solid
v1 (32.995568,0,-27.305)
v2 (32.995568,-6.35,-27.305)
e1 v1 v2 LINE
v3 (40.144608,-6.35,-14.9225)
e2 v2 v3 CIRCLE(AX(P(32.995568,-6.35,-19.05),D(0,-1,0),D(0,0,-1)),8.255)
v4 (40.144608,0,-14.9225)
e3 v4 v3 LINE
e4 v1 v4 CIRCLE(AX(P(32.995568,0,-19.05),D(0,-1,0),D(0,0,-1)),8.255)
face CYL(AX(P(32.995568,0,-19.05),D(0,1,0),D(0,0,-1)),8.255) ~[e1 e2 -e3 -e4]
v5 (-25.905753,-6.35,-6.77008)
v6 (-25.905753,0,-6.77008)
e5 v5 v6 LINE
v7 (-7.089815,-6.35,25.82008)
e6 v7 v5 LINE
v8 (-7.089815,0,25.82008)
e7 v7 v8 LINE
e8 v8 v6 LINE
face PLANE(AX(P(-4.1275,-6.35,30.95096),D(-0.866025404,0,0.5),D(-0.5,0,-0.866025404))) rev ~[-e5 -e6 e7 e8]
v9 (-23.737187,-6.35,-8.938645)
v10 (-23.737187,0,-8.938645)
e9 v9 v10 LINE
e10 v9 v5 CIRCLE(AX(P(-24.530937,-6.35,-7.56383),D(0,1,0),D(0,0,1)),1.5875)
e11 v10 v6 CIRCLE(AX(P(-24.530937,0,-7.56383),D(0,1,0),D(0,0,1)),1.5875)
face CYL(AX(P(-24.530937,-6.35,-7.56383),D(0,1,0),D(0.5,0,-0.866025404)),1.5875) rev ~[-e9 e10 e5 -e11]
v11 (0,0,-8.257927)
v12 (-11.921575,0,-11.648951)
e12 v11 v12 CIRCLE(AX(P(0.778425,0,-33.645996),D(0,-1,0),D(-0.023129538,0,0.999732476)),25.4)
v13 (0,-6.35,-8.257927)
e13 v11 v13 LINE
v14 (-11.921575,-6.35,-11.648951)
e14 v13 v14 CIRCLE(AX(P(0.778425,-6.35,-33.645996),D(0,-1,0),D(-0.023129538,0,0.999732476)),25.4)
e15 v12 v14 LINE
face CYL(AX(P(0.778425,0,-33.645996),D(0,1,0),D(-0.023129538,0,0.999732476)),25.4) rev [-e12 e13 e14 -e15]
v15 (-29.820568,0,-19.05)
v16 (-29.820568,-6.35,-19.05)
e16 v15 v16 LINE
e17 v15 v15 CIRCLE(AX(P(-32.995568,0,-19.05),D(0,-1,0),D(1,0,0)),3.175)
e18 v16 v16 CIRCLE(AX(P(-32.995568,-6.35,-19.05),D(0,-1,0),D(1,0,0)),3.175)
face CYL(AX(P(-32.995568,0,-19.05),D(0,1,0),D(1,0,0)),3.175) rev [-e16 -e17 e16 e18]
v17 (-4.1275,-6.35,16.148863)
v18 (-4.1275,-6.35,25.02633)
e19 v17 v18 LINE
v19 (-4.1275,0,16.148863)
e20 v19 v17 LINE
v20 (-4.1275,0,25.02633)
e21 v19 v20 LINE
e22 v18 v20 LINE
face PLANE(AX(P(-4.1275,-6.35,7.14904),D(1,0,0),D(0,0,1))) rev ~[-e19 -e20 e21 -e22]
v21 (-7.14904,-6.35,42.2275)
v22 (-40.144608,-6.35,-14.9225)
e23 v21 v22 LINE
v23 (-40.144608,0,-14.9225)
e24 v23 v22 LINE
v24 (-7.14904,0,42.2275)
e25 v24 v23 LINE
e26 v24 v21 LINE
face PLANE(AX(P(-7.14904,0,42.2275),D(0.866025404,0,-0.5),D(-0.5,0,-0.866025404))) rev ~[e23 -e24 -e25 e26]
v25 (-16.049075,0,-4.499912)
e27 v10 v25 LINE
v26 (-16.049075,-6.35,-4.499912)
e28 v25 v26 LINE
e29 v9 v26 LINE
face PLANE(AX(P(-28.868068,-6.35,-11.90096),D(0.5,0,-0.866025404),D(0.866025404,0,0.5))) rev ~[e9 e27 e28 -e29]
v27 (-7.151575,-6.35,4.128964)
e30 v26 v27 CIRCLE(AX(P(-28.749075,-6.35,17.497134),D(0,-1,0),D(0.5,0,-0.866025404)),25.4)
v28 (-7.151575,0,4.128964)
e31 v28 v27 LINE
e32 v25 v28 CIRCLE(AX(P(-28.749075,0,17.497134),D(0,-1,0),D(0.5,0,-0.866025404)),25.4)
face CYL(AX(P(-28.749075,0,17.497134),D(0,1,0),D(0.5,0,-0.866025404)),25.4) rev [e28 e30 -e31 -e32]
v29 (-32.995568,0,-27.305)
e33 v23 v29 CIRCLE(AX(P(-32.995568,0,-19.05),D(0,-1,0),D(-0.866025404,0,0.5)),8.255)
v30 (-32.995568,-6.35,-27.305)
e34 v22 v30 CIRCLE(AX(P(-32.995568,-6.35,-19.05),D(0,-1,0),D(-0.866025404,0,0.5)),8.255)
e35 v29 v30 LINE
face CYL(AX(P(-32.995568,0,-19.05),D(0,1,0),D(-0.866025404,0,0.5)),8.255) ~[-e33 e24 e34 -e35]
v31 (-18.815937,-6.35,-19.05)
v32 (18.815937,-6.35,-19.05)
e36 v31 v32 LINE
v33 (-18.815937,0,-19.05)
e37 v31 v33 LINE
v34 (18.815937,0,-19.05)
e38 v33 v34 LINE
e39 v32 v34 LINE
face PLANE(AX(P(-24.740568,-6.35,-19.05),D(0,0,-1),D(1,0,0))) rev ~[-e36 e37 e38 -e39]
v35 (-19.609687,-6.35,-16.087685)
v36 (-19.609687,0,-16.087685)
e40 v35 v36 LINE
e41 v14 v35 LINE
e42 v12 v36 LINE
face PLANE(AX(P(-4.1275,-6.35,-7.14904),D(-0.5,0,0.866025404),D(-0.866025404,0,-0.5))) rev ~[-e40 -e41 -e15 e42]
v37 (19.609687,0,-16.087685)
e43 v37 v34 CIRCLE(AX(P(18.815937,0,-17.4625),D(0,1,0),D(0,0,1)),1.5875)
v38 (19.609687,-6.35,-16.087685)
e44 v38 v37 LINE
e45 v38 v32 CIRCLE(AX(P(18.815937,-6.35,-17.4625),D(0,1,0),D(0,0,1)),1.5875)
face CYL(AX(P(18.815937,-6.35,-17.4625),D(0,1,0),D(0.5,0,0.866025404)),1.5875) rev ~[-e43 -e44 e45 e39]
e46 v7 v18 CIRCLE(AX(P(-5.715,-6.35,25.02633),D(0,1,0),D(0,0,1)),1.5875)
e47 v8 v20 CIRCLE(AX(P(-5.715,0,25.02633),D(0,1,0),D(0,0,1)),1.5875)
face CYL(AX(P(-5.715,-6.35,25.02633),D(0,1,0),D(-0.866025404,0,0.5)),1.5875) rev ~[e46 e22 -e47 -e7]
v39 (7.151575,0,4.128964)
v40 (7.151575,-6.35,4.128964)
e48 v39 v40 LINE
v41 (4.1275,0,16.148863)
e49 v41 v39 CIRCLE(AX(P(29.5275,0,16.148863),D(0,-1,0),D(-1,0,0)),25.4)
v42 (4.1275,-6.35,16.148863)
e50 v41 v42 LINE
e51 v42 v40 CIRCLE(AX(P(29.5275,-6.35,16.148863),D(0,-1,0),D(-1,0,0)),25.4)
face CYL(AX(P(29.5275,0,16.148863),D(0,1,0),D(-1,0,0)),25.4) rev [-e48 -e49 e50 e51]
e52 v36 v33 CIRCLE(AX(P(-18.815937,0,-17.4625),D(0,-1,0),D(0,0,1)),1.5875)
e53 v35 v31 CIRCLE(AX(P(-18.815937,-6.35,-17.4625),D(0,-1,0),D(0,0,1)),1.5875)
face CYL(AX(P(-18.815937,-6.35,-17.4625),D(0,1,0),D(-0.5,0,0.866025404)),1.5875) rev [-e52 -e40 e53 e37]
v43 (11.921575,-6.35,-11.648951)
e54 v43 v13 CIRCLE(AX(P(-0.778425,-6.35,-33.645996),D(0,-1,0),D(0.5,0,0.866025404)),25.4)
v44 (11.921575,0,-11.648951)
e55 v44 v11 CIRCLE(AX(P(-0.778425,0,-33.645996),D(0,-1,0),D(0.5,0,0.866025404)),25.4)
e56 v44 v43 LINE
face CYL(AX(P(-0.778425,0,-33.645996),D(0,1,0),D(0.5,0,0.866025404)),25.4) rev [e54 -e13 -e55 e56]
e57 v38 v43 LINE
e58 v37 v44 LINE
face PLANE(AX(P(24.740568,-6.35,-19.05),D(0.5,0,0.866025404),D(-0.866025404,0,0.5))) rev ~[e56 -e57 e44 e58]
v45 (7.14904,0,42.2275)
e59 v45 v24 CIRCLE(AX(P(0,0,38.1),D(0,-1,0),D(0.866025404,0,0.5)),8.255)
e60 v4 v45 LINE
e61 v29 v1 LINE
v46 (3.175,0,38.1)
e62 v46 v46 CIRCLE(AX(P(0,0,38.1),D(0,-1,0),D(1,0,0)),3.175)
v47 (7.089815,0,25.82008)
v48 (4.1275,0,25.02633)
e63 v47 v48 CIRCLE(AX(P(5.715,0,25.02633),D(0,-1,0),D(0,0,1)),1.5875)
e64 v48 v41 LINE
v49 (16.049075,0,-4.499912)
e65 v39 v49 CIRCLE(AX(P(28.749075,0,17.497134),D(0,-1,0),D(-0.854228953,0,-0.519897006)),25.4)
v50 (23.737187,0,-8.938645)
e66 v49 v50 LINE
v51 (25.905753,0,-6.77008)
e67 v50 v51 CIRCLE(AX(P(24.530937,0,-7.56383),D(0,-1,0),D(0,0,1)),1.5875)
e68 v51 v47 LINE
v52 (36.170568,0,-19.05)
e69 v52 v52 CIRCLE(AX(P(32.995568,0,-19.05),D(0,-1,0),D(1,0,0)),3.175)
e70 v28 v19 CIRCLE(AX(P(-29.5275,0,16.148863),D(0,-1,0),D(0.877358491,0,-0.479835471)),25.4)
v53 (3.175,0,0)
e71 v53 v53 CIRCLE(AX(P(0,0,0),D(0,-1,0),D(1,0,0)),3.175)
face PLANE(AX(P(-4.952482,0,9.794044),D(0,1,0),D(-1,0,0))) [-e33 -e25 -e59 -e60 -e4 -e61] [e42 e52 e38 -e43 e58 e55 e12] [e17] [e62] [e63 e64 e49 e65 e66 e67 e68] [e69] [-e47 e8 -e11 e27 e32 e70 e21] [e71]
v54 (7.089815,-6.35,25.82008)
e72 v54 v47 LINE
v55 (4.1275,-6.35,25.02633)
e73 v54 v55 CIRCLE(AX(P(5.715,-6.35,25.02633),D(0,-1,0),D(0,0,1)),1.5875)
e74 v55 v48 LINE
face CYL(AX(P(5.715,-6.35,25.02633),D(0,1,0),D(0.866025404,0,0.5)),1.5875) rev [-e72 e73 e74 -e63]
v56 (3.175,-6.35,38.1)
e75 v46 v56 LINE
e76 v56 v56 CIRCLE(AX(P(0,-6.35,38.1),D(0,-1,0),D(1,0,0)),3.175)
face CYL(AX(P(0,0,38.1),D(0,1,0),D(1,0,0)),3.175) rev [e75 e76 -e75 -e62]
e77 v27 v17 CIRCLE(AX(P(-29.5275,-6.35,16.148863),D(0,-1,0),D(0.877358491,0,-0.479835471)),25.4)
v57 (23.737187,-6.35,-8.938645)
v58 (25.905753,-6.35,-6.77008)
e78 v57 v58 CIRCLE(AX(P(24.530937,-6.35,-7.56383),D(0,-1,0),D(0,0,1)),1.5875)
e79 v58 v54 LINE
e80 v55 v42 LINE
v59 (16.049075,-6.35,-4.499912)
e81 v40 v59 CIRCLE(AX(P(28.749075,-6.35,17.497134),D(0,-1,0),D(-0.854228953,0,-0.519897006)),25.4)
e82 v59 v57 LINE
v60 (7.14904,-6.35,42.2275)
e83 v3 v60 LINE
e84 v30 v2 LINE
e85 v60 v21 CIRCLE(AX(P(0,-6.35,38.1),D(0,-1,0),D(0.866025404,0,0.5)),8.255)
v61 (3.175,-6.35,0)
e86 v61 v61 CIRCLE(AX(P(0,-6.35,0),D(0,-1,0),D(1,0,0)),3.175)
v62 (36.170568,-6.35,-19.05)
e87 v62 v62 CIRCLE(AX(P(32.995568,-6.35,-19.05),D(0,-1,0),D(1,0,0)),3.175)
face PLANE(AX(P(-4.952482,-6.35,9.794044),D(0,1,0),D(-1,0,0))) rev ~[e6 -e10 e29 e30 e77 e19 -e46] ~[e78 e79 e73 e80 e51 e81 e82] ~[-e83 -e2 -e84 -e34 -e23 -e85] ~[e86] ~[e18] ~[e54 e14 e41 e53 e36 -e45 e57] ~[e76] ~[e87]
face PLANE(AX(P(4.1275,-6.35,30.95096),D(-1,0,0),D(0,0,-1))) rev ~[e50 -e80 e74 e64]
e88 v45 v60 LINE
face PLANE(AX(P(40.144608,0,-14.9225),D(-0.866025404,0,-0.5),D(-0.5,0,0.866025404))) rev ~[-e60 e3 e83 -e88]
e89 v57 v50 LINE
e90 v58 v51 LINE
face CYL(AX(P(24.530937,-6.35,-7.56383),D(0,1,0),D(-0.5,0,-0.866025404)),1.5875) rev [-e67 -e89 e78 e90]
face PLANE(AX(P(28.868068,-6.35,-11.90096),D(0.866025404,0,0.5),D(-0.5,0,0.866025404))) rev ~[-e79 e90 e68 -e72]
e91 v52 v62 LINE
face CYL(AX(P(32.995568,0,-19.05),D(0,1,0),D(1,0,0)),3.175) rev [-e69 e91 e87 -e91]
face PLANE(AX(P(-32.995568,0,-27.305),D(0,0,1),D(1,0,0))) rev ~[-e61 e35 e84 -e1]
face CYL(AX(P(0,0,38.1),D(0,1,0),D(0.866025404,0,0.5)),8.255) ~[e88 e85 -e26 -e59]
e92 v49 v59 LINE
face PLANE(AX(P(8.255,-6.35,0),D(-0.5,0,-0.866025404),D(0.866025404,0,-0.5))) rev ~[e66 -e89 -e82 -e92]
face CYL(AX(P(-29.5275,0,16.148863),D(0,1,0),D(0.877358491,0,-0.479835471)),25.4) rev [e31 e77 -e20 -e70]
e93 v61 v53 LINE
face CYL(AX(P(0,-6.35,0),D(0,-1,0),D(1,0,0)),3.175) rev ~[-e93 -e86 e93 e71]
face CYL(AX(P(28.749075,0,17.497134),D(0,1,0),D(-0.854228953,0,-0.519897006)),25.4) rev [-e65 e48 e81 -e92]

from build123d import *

# Parameters (mm, degrees)
F0_R        = 3.175
F1_DEPTH    = 6.35
F2_R        = 3.175
F3_DEPTH    = 6.351
F5_DEPTH    = 6.351
F6_T1_DEPTH = 6.35
F7_R        = 1.5875


# Not quite as in the source:
# - a fillet or chamfer that OpenCascade refuses, or shapes differently, is made with other operations: its cross-section is extruded or revolved along the edge and cut away or added


with BuildPart() as f1:
    # F0 (on Front) → F1 (new body)
    with BuildSketch(Plane.XZ):
        with BuildLine():
            ThreePointArc((32.9955678842, -27.305), (40.1446075924, -23.1775), (40.1446075924, -14.9225))
            Line((40.1446075924, -14.9225), (7.1490397082, 42.2275))
            ThreePointArc((7.1490397082, 42.2275), (0, 46.355), (-7.1490397082, 42.2275))
            Line((-7.1490397082, 42.2275), (-40.1446075924, -14.9225))
            ThreePointArc((-40.1446075924, -14.9225), (-40.1446075924, -23.1775), (-32.9955678842, -27.305))
            Line((-32.9955678842, -27.305), (32.9955678842, -27.305))
        make_face()
        with Locations((-32.9955678842, -19.05)):
            Circle(F0_R, mode=Mode.SUBTRACT)
        with Locations((32.9955678842, -19.05)):
            Circle(F0_R, mode=Mode.SUBTRACT)
        with Locations((0, 38.1)):
            Circle(F0_R, mode=Mode.SUBTRACT)
    extrude(amount=F1_DEPTH)

    # F2 (on face) → F3 (cut, through all)
    with BuildSketch(Plane.XZ.offset(6.35)):
        Circle(F2_R)
    extrude(amount=-F3_DEPTH, mode=Mode.SUBTRACT)

    # F4 (on face) → F5 (cut, through all)
    with BuildSketch(Plane.XZ.offset(6.35)):
        with BuildLine():
            ThreePointArc((-8.255, 0), (-7.1490397082, 4.1275), (-4.1275, 7.1490397082))
            Line((-4.1275, 7.1490397082), (-4.1275, 30.9509602918))
            Line((-4.1275, 30.9509602918), (-28.8680678842, -11.9009602918))
            Line((-28.8680678842, -11.9009602918), (-8.255, 0))
        make_face()
        with BuildLine():
            Line((24.7405678842, -19.05), (4.1275, -7.1490397082))
            ThreePointArc((4.1275, -7.1490397082), (0, -8.255), (-4.1275, -7.1490397082))
            Line((-4.1275, -7.1490397082), (-24.7405678842, -19.05))
            Line((-24.7405678842, -19.05), (24.7405678842, -19.05))
        make_face()
        with BuildLine():
            ThreePointArc((4.1275, 7.1490397082), (7.1490397082, 4.1275), (8.255, 0))
            Line((8.255, 0), (28.8680678842, -11.9009602918))
            Line((28.8680678842, -11.9009602918), (4.1275, 30.9509602918))
            Line((4.1275, 30.9509602918), (4.1275, 7.1490397082))
        make_face()
    extrude(amount=-F5_DEPTH, mode=Mode.SUBTRACT)

    # F6: fillet of radius 25.4 on 6 edges, made by hand

    # F6_s2 → F6_t1 (join)
    with BuildSketch(Plane.XZ):
        with BuildLine():
            ThreePointArc((-7.2425943396, 3.9610418114), (-4.9185930375, 9.8590537015), (-4.1275, 16.1488627696))
            Line((-4.1275, 16.1488627696), (-4.1275, 7.1490397082))
            ThreePointArc((-4.1275, 7.1490397082), (-5.9042860678, 5.7692660737), (-7.2425943396, 3.9610418114))
        make_face()
        with BuildLine():
            ThreePointArc((-16.0490754007, -4.4999115307), (-10.9974874815, -0.6699003293), (-7.0516600039, 4.2917497817))
            ThreePointArc((-7.0516600039, 4.2917497817), (-7.9484740149, 2.2286286891), (-8.255, 0))
            Line((-8.255, 0), (-16.0490754007, -4.4999115307))
        make_face()
        with BuildLine():
            ThreePointArc((0.1909343357, -8.2527915931), (-6.078894444, -9.1891533721), (-11.9215754007, -11.6489512389))
            Line((-11.9215754007, -11.6489512389), (-4.1275, -7.1490397082))
            ThreePointArc((-4.1275, -7.1490397082), (-2.0441879471, -7.9978947628), (0.1909343357, -8.2527915931))
        make_face()
        with BuildLine():
            ThreePointArc((11.9215754007, -11.6489512389), (6.078894444, -9.1891533721), (-0.1909343357, -8.2527915931))
            ThreePointArc((-0.1909343357, -8.2527915931), (2.0441879471, -7.9978947628), (4.1275, -7.1490397082))
            Line((4.1275, -7.1490397082), (11.9215754007, -11.6489512389))
        make_face()
        with BuildLine():
            ThreePointArc((7.0516600039, 4.2917497817), (10.9974874815, -0.6699003293), (16.0490754007, -4.4999115307))
            Line((16.0490754007, -4.4999115307), (8.255, 0))
            ThreePointArc((8.255, 0), (7.9484740149, 2.2286286891), (7.0516600039, 4.2917497817))
        make_face()
        with BuildLine():
            ThreePointArc((4.1275, 16.1488627696), (4.9185930375, 9.8590537015), (7.2425943396, 3.9610418114))
            ThreePointArc((7.2425943396, 3.9610418114), (5.9042860678, 5.7692660737), (4.1275, 7.1490397082))
            Line((4.1275, 7.1490397082), (4.1275, 16.1488627696))
        make_face()
    extrude(amount=F6_T1_DEPTH)

    # F7
    f7_edges = [f1.edges().sort_by_distance(p)[0] for p in [
        (4.1275, -3.175, 30.95096),
        (-4.1275, -3.175, 30.95096),
        (-28.868068, -3.175, -11.90096),
        (28.868068, -3.175, -11.90096),
        (24.740568, -3.175, -19.05),
        (-24.740568, -3.175, -19.05),
    ]]
    fillet(f7_edges, radius=F7_R)


solid = f1.part
